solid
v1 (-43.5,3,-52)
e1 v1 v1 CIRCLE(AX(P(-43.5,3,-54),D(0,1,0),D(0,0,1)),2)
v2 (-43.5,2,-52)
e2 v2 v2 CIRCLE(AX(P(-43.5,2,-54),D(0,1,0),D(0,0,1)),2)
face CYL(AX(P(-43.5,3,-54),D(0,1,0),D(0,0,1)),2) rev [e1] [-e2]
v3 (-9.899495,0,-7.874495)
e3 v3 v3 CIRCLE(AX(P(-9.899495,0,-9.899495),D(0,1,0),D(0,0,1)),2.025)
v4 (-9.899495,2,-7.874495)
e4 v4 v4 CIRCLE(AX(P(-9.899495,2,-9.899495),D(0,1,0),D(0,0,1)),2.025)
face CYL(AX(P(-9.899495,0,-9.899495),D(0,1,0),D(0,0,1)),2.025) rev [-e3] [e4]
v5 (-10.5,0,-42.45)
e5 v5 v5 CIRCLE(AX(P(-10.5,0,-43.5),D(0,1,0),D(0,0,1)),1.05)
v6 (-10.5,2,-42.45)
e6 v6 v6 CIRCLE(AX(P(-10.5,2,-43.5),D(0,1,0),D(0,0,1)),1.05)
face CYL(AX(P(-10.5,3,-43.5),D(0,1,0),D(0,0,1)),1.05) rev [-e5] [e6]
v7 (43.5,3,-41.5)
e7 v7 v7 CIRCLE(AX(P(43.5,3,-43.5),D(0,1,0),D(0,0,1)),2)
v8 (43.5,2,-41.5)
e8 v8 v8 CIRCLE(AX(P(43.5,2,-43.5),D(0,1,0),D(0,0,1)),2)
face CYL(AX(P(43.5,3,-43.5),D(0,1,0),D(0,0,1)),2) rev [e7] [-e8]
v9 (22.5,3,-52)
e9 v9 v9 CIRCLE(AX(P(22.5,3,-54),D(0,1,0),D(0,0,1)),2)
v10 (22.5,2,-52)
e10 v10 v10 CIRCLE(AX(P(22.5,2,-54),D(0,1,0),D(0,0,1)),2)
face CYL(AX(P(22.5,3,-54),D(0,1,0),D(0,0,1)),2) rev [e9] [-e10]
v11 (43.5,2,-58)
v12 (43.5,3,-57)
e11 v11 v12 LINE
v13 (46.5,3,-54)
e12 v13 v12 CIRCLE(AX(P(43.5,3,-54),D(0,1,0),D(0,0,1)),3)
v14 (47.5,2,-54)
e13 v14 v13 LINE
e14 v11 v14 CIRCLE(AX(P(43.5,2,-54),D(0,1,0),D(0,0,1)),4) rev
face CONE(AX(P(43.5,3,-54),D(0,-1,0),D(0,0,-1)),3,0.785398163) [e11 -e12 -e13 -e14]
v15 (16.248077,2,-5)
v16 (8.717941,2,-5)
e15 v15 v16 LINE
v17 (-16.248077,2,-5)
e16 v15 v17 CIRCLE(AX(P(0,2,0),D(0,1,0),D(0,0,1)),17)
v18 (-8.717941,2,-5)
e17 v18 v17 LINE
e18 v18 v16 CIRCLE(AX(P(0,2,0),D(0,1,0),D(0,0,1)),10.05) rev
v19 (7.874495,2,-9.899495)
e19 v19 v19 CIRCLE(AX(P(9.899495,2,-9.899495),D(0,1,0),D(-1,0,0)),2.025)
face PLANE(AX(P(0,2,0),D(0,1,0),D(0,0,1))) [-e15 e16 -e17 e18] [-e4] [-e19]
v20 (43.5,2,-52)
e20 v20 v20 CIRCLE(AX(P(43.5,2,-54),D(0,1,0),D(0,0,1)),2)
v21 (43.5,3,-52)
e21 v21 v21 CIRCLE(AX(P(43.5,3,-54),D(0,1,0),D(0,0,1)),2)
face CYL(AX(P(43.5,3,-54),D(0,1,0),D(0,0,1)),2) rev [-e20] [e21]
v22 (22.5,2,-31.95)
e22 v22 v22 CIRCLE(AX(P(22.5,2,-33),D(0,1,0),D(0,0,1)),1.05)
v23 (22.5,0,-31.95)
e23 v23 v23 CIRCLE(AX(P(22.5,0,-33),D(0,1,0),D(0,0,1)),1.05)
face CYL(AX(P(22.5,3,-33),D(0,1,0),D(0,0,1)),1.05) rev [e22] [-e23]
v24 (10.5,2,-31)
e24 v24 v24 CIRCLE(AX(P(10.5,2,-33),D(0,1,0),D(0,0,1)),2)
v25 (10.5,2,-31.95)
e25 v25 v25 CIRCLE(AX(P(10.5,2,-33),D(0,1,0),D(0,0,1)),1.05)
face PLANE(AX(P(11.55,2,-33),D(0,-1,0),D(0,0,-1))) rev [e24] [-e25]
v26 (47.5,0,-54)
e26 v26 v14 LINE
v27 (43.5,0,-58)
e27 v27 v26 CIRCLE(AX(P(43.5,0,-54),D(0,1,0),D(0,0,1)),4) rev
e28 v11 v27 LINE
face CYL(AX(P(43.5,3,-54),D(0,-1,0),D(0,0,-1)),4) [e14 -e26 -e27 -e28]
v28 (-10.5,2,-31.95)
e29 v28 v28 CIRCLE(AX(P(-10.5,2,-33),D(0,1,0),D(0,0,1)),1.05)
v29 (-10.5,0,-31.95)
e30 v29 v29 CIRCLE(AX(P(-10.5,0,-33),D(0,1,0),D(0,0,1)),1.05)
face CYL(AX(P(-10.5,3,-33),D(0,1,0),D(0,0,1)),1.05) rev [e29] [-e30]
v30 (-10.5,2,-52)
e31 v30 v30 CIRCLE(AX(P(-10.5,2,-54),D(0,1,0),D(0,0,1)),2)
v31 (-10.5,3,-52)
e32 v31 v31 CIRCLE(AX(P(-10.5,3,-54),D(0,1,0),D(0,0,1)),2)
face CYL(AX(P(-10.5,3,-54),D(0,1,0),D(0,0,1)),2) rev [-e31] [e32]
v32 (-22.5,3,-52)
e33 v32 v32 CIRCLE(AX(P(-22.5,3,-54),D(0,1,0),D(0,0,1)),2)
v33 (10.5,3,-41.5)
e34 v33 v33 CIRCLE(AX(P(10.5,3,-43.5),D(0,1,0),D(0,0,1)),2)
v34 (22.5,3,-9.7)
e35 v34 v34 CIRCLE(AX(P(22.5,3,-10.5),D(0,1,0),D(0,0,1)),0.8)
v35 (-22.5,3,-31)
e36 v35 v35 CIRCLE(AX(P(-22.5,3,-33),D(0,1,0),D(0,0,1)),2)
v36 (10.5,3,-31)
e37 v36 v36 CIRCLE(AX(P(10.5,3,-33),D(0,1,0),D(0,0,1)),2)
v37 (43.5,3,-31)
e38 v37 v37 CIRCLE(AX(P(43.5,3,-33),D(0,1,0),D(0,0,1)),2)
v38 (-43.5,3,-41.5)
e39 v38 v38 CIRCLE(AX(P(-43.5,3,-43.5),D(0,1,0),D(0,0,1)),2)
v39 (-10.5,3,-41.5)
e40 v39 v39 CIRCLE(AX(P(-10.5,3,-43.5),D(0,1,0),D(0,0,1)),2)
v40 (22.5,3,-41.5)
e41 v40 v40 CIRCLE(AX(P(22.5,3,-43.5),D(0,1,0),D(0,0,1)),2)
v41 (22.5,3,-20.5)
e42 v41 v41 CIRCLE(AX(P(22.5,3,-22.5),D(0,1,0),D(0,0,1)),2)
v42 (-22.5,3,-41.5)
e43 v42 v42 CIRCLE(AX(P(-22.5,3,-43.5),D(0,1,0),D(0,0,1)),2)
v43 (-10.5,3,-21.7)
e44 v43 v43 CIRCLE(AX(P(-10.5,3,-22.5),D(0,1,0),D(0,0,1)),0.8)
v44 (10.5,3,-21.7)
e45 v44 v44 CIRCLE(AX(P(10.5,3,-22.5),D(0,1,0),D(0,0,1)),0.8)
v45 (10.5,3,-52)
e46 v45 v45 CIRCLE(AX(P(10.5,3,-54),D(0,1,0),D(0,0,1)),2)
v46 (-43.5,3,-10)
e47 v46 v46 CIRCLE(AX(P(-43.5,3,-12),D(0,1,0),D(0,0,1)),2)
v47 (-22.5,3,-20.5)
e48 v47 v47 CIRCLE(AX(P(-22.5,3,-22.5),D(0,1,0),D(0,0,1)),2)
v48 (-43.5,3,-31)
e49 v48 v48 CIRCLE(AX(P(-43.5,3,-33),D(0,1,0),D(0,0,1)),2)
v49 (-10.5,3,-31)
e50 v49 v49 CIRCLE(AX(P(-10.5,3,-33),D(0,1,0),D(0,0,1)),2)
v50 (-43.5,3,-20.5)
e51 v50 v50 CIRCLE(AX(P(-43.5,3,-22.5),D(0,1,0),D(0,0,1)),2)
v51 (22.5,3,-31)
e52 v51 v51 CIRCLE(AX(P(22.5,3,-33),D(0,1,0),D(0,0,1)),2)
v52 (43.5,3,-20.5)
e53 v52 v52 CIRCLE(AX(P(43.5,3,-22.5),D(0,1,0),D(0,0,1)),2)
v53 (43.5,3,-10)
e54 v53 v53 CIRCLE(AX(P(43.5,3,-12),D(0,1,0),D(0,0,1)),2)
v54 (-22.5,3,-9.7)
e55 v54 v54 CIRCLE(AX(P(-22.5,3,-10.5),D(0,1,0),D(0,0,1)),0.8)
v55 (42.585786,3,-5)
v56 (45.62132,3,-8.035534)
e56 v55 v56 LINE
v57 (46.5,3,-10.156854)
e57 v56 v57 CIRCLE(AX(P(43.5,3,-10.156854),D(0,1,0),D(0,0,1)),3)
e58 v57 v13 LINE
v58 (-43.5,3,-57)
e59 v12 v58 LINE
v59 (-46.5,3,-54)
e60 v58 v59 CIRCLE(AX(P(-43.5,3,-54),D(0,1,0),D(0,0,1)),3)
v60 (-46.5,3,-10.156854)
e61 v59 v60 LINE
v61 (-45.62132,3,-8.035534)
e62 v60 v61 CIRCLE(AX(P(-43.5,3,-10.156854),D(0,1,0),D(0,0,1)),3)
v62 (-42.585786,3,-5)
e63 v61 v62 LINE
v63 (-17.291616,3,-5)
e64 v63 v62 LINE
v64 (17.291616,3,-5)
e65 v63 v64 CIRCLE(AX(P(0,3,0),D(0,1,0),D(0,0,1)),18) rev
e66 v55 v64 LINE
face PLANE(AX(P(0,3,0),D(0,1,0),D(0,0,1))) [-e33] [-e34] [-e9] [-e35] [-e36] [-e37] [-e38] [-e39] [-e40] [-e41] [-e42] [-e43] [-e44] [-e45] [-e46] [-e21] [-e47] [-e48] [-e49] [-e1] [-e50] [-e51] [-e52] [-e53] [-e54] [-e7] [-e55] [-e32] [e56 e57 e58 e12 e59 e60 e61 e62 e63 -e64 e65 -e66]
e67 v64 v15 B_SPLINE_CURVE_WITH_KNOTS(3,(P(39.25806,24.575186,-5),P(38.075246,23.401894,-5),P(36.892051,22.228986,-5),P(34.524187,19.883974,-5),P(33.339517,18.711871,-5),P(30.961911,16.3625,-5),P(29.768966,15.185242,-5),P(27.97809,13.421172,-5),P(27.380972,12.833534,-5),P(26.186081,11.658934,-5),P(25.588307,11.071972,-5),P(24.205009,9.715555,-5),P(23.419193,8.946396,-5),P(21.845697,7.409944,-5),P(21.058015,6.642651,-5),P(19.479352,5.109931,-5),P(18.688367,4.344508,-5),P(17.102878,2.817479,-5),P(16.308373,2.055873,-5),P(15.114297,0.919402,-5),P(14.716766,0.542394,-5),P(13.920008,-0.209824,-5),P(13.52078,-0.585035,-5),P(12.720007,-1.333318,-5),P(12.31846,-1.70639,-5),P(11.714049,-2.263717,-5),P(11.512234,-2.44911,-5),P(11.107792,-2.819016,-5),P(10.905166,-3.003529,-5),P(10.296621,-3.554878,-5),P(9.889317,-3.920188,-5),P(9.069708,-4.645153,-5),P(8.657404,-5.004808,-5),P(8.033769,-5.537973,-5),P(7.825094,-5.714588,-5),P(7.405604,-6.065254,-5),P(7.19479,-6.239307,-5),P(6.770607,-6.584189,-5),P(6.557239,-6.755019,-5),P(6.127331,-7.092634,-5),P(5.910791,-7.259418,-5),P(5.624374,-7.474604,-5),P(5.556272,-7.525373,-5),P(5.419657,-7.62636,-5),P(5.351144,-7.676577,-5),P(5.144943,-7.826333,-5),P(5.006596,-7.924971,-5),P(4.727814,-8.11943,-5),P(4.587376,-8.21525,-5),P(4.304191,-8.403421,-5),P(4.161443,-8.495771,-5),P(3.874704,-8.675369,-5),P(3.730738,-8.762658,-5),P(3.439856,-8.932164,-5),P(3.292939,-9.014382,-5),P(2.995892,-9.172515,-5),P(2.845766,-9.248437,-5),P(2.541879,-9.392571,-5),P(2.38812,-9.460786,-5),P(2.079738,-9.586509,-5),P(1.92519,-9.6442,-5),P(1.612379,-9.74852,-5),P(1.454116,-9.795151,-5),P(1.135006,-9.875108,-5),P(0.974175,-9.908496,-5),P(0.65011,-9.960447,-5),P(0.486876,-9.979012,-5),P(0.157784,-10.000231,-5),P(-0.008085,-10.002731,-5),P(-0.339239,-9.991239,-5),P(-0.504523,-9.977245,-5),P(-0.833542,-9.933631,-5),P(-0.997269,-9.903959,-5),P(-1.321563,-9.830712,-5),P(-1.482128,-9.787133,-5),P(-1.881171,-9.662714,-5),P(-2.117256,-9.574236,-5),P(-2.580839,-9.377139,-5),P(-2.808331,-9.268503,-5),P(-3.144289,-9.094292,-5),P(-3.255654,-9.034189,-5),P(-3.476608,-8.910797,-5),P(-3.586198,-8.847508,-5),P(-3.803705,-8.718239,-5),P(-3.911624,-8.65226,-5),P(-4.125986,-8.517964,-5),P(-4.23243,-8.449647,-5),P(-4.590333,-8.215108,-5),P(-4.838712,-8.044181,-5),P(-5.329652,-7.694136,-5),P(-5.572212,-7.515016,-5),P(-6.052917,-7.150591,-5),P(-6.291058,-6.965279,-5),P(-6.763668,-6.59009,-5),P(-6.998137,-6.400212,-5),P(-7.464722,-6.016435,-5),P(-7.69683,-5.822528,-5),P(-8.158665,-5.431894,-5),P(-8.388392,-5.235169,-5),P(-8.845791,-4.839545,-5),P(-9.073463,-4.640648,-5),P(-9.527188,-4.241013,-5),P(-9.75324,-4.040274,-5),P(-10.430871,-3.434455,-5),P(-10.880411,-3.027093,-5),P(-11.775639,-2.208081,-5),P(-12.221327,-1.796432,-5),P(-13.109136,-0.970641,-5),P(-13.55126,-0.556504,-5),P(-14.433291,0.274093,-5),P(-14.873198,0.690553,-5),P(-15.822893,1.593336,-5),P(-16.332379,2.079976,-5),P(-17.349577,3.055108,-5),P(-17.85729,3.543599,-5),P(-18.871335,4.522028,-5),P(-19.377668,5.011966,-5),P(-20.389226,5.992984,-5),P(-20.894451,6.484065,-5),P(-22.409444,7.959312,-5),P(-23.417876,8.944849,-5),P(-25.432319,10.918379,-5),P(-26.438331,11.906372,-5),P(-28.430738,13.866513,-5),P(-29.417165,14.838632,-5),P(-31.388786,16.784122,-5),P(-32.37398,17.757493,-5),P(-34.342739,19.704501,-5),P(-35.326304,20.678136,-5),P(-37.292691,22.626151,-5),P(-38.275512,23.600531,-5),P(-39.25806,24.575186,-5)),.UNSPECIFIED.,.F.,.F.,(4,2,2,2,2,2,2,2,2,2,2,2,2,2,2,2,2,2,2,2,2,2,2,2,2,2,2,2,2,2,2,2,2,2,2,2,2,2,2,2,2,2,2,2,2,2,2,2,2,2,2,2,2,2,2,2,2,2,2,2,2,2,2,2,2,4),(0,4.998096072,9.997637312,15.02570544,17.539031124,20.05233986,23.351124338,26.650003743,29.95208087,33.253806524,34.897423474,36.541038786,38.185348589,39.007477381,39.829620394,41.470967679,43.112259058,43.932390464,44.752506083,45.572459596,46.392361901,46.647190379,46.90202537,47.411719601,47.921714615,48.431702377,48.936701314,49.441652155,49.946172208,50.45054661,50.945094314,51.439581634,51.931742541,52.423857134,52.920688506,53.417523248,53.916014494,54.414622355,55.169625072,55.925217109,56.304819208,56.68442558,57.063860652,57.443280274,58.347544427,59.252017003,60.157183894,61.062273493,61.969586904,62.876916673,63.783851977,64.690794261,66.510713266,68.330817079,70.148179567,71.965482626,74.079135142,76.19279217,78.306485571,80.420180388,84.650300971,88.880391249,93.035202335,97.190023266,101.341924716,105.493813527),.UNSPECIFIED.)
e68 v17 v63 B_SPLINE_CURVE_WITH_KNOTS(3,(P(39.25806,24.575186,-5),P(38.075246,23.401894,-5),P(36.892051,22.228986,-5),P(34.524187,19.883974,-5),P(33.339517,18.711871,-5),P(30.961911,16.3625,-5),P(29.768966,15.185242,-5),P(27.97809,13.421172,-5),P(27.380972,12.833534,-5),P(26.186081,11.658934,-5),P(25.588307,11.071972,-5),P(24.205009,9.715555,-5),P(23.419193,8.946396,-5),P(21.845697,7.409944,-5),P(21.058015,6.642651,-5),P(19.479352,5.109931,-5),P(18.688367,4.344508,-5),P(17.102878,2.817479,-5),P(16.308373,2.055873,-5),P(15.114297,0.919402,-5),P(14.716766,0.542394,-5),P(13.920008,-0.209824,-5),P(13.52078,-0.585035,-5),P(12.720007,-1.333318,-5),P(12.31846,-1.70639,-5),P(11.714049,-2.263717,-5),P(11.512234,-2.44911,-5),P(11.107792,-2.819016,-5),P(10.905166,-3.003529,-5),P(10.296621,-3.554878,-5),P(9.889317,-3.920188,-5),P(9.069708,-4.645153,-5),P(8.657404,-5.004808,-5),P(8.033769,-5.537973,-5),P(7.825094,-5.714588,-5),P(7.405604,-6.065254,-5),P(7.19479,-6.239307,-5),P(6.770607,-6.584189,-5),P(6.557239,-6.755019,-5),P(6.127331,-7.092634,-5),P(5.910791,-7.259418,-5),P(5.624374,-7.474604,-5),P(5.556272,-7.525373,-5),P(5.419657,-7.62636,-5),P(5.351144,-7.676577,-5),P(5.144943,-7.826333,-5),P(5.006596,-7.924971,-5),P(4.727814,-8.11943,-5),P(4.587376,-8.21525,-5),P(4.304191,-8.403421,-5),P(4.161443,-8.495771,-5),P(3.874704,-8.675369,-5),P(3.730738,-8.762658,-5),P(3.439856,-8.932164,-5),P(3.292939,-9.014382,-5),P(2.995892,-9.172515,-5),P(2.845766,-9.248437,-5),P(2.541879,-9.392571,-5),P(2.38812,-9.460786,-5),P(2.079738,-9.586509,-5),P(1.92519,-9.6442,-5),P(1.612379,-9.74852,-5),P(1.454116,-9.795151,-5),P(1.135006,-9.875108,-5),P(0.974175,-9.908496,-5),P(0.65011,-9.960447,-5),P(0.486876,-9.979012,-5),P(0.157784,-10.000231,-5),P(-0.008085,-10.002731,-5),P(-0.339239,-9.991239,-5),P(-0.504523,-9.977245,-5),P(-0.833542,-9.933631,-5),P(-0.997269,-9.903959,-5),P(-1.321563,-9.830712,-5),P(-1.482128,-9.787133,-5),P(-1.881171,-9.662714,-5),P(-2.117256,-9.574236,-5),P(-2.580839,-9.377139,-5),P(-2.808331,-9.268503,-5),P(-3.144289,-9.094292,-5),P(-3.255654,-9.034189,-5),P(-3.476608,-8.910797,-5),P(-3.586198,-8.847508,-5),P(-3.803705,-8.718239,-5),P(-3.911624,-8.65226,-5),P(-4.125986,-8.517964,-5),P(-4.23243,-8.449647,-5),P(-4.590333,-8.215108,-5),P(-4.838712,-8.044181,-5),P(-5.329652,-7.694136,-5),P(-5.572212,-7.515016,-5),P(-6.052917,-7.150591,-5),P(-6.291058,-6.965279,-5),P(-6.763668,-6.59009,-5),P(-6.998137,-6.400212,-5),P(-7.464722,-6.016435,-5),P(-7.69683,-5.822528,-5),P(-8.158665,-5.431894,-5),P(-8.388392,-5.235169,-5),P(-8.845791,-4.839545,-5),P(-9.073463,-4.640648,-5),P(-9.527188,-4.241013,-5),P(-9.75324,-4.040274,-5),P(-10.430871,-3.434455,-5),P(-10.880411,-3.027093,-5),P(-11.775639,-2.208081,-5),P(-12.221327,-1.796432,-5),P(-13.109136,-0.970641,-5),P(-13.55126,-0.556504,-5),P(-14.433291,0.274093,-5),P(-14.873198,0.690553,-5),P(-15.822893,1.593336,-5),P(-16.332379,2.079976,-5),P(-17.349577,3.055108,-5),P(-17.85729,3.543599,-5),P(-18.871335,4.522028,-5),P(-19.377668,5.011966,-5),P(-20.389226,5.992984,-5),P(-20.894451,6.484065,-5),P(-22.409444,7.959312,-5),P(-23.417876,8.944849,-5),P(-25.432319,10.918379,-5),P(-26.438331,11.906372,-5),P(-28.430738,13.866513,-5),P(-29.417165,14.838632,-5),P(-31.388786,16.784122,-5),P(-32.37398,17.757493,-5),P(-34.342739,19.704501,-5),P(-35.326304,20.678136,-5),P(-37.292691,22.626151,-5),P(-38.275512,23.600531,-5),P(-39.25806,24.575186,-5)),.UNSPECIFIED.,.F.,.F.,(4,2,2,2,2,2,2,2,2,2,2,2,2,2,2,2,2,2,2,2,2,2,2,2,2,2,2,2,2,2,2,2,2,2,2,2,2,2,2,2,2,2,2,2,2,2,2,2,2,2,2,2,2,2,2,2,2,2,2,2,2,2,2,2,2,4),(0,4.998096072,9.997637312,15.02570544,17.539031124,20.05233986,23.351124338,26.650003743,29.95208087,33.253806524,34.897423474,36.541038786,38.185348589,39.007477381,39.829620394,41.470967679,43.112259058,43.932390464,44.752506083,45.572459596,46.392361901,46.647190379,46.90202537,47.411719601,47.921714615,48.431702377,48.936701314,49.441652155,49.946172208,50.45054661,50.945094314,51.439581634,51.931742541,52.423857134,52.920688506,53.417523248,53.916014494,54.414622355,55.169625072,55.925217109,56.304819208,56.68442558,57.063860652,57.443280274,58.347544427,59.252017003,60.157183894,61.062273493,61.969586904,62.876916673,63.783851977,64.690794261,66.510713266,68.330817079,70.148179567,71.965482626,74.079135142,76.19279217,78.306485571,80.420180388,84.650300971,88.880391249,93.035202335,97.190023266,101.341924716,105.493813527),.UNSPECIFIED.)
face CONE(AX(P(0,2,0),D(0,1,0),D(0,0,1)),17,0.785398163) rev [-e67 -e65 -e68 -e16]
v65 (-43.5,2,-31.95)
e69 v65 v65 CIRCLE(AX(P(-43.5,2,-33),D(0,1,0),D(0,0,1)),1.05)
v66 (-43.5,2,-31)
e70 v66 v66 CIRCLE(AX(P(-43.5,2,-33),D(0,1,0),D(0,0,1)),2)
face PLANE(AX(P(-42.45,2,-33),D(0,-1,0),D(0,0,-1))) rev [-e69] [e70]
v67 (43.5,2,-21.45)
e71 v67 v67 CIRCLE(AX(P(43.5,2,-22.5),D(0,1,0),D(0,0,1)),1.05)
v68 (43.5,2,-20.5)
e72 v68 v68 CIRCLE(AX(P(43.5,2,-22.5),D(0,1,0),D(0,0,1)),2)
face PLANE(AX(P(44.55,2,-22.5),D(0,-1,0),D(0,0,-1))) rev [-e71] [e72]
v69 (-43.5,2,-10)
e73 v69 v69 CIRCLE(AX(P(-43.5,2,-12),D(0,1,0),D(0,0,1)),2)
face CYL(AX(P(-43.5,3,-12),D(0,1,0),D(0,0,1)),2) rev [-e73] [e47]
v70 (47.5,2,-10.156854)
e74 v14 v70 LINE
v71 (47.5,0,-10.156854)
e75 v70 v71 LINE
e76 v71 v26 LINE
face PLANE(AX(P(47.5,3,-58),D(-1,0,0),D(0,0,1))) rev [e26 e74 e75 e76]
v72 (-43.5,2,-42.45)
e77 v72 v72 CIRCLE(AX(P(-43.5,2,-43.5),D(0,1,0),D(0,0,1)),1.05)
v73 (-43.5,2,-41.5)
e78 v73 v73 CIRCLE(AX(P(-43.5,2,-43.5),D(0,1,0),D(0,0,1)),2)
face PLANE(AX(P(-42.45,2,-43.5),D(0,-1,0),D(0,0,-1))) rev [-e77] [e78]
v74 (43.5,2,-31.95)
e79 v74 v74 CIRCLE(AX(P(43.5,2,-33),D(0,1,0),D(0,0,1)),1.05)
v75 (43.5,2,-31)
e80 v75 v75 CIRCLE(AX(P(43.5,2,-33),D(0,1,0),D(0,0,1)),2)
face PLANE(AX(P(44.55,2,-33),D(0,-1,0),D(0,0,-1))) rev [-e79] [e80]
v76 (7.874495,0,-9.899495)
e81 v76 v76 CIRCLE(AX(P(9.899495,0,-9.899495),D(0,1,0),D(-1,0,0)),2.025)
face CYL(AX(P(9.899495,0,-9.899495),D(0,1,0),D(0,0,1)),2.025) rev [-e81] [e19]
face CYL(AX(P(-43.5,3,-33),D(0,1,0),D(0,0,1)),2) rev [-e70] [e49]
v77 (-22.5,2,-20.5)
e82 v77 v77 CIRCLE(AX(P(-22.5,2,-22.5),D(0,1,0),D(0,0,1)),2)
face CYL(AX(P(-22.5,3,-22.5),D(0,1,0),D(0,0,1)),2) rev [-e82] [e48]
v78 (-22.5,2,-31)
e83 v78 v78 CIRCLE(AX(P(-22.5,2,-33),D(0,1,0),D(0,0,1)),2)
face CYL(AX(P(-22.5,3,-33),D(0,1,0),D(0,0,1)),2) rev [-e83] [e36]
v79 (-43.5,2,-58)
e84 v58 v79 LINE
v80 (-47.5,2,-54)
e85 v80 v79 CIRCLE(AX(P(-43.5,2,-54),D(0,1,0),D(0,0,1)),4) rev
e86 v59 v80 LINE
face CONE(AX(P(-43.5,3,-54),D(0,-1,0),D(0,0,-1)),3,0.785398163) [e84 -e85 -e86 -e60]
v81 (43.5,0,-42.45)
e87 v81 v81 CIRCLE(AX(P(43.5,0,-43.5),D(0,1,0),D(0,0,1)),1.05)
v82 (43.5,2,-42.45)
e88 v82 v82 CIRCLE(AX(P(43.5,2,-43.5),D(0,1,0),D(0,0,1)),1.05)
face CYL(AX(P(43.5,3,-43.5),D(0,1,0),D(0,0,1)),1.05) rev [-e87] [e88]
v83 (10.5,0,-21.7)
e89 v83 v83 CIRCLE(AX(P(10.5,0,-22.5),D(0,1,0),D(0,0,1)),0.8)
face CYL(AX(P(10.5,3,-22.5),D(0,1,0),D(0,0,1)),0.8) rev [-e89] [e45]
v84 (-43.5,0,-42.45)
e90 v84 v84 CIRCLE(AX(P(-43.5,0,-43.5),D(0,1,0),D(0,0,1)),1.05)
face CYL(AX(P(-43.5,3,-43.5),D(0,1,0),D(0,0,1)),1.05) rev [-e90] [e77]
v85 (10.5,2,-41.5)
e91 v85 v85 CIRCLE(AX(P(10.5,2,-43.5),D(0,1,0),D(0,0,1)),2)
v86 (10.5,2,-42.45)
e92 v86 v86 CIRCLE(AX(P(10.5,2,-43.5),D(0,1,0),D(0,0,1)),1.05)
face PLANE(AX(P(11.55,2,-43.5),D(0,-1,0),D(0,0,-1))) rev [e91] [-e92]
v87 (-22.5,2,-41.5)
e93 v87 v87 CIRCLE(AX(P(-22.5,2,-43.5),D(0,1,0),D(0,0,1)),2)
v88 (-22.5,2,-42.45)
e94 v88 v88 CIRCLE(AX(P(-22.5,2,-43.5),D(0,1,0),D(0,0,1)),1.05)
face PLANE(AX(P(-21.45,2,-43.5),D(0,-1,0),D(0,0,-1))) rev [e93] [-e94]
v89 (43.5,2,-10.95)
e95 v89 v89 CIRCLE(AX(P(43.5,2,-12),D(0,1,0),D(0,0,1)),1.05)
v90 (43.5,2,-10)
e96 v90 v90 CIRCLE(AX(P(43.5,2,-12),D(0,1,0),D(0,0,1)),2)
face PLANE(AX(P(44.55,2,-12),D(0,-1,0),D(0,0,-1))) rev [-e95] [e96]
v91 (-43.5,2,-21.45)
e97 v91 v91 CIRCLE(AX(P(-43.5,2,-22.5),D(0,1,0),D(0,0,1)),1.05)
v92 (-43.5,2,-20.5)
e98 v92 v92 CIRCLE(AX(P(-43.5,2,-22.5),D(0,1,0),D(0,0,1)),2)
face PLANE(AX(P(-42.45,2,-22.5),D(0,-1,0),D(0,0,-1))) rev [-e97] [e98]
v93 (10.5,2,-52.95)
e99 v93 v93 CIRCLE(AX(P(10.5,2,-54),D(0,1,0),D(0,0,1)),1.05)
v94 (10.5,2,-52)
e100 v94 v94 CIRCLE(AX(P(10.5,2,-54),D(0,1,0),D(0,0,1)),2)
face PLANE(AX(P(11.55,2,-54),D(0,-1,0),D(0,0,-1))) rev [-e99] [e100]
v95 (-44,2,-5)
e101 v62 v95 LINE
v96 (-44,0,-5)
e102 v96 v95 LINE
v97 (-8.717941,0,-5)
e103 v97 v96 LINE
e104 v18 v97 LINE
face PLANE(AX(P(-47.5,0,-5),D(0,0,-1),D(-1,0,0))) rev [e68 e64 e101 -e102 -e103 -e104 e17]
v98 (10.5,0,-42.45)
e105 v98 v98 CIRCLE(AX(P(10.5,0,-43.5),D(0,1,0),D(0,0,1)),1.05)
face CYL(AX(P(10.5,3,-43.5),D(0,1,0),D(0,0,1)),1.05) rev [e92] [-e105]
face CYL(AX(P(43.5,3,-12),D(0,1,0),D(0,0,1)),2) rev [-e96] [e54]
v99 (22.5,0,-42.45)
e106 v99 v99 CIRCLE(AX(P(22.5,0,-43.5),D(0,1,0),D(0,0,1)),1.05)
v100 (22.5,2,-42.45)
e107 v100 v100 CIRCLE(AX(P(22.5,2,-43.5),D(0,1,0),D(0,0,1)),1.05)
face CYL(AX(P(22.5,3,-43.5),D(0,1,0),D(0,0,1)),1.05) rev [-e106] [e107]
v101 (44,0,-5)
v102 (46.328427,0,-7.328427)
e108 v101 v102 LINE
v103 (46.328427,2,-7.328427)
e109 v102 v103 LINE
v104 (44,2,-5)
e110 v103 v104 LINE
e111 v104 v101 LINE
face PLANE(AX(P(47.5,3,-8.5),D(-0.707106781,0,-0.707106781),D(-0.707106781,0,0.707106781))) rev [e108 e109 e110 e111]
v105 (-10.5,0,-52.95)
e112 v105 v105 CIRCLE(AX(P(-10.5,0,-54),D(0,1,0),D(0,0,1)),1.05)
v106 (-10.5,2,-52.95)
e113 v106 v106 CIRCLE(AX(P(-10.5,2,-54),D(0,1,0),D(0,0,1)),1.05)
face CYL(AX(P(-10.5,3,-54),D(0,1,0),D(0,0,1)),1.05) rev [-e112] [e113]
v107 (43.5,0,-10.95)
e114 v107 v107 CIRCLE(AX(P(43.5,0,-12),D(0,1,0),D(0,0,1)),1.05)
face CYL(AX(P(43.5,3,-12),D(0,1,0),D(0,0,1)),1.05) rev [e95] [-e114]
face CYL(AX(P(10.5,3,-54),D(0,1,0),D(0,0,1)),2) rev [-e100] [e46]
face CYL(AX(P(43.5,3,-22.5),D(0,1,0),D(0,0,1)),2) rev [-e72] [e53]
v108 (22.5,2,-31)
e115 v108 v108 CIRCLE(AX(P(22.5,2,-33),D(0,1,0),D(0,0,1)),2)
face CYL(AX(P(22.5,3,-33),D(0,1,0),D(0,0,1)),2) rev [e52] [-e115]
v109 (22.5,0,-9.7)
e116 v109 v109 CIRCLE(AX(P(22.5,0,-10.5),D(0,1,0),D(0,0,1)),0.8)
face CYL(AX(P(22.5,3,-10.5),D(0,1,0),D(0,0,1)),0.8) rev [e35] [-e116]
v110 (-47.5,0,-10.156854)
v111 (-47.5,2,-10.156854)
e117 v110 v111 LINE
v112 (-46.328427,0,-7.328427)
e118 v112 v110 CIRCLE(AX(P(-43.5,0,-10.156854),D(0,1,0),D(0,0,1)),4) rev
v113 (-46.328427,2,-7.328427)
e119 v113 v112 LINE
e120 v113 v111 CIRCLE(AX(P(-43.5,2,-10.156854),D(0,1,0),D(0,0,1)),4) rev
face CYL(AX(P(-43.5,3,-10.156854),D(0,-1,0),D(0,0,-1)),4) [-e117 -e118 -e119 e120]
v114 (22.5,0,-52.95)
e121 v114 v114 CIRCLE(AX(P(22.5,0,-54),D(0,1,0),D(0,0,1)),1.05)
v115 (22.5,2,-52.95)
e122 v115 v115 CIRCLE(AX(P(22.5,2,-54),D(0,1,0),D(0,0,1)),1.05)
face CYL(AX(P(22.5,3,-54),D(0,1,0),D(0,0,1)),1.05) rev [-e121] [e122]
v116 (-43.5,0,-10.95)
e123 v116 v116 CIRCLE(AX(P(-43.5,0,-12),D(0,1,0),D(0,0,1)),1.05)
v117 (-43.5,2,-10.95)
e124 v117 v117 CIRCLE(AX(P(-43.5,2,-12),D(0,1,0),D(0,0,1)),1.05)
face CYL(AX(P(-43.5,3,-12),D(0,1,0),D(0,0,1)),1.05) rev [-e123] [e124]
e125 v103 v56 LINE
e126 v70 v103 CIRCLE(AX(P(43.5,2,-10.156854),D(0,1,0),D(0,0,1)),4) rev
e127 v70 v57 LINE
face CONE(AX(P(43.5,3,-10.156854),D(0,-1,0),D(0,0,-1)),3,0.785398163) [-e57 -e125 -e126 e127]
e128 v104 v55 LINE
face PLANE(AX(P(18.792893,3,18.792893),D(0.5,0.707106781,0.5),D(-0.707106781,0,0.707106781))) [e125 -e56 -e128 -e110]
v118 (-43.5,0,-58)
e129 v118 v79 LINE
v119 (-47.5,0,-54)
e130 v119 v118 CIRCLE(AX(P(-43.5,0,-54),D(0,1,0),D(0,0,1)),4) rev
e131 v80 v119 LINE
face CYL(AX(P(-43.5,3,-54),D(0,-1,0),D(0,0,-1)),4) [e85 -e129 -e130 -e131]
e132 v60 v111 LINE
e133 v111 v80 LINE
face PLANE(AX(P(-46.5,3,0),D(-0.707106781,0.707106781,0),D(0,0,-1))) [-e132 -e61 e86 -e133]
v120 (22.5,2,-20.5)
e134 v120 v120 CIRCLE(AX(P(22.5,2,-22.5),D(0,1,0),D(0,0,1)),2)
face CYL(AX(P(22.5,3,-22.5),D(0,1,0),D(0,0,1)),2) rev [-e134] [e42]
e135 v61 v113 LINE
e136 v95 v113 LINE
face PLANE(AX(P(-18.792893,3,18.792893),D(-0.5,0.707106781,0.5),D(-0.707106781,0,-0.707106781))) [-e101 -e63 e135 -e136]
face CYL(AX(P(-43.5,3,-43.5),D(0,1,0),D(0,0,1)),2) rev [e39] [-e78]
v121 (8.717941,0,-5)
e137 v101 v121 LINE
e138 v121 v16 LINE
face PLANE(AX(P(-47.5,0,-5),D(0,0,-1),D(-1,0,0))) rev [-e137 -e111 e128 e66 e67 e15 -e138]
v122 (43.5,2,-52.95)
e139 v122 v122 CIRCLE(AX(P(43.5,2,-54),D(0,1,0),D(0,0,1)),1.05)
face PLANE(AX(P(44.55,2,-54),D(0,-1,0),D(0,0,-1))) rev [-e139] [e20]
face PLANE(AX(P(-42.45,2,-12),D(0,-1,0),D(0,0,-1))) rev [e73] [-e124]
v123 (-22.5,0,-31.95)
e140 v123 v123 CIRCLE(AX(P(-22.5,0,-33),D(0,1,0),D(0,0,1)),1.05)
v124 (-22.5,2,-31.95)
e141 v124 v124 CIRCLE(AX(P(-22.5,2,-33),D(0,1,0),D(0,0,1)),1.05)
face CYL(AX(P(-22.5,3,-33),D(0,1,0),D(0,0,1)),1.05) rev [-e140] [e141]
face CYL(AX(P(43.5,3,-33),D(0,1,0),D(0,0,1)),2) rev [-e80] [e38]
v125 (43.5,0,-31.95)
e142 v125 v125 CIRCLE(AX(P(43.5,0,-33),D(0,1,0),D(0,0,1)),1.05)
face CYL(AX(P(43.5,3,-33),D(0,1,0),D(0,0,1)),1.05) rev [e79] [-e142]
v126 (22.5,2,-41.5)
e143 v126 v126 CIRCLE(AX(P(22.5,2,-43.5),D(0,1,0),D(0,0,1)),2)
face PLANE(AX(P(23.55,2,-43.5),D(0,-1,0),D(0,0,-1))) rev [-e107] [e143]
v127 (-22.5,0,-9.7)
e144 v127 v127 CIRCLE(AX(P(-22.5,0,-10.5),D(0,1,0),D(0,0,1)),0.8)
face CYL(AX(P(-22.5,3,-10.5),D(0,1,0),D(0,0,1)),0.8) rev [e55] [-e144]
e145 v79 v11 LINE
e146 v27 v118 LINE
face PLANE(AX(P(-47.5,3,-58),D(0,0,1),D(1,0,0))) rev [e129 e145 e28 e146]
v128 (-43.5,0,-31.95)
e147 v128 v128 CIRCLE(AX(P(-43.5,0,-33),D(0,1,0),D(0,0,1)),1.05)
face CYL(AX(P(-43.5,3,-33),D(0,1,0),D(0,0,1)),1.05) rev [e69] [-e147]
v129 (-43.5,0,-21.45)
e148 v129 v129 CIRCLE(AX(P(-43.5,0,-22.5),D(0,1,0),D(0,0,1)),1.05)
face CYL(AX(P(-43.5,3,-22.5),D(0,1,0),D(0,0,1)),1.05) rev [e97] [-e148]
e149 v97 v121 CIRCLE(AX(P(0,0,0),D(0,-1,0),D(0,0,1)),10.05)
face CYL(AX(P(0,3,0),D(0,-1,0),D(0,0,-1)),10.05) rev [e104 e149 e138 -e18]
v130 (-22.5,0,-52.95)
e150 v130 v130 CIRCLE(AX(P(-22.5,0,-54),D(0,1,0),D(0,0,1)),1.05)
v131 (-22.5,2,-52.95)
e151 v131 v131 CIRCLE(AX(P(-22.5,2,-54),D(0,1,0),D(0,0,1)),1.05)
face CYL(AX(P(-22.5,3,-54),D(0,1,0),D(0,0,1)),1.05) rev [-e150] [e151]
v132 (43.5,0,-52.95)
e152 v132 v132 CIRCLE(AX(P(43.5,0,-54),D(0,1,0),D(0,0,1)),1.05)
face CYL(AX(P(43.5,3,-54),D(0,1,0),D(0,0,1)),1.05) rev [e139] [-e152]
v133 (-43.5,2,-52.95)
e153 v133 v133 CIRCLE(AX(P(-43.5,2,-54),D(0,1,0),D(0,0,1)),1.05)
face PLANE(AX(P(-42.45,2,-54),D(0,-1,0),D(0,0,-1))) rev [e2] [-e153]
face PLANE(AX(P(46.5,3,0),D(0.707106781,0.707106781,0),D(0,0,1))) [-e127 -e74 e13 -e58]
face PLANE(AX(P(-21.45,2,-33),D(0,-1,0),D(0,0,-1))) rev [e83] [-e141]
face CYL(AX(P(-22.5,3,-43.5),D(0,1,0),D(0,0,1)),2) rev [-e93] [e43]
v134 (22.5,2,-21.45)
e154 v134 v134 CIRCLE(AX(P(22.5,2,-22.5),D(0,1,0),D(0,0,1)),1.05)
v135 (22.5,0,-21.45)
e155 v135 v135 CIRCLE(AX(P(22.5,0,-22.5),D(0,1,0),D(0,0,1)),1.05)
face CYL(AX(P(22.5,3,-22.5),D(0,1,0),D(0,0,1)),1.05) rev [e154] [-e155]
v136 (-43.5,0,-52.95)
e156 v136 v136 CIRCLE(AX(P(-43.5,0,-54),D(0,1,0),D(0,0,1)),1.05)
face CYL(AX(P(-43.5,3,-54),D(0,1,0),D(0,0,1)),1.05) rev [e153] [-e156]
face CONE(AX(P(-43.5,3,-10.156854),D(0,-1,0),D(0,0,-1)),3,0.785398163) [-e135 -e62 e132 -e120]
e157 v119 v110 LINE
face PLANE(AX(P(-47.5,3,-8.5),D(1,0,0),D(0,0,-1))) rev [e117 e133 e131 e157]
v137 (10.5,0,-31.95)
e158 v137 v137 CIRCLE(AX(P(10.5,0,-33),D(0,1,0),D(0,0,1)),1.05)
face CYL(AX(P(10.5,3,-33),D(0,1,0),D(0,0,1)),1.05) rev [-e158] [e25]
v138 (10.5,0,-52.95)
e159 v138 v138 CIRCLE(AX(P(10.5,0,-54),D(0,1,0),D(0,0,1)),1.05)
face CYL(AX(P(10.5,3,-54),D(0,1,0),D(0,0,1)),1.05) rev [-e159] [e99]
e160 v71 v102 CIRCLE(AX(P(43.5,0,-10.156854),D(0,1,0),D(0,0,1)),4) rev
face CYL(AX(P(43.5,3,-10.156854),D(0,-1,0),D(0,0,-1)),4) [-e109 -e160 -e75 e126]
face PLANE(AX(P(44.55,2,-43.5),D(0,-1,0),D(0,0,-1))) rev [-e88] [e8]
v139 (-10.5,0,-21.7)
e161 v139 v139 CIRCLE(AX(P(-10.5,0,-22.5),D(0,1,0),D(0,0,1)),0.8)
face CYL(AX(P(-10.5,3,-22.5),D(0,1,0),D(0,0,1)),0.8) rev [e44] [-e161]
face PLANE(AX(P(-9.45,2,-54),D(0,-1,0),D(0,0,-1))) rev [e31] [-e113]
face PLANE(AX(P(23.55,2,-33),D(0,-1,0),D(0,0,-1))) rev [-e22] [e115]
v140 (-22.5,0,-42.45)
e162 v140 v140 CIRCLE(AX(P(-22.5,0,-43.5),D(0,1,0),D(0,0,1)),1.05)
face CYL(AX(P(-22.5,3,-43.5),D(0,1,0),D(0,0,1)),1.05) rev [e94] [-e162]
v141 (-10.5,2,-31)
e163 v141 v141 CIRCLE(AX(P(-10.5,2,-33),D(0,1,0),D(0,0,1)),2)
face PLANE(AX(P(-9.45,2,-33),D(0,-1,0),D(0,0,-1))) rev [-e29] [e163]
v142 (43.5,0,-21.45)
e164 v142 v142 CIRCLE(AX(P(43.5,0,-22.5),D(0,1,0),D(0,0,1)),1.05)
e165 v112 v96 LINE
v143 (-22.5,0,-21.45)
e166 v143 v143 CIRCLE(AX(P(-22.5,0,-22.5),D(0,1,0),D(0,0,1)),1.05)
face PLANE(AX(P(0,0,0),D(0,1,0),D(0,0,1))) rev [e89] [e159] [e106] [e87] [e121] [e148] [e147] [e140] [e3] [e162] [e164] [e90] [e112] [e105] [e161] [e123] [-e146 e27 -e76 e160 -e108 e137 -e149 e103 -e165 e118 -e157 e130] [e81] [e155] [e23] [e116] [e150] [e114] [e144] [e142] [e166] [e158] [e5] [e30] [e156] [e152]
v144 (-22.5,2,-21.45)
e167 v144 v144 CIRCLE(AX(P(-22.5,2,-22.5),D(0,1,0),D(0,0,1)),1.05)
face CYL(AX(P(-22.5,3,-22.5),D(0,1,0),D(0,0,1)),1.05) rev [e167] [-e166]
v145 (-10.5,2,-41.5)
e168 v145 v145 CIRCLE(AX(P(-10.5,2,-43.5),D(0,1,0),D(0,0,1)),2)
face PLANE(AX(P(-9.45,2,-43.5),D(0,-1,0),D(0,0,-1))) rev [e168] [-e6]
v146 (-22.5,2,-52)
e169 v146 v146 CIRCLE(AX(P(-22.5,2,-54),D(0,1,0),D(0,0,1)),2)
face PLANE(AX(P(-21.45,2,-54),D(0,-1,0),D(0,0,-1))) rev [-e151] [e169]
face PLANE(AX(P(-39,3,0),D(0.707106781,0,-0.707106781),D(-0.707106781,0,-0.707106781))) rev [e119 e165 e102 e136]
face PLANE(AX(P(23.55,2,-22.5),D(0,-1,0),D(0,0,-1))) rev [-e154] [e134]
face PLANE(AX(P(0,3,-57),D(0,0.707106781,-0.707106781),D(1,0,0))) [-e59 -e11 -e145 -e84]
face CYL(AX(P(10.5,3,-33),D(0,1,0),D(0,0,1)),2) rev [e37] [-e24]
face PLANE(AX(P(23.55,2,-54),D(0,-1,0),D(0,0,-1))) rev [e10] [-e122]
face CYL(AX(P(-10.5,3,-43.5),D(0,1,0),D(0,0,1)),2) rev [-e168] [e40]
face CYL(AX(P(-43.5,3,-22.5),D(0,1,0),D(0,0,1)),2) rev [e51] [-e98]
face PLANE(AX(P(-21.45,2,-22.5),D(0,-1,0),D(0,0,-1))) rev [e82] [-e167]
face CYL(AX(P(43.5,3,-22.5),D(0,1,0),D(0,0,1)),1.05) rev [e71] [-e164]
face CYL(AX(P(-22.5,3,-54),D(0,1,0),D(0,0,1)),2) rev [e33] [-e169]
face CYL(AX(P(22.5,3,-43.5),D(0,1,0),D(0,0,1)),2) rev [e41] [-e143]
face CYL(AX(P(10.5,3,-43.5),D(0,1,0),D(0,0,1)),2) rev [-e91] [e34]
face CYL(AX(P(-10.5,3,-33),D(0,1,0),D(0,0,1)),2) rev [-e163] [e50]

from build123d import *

# Parameters (mm, degrees)
EXTRUDE_1_DEPTH               = 3
HOLE_WIZARD_M2_1_AT_2_COUNT   = 2
HOLE_WIZARD_M2_1_AT_2_PITCH   = 21
PATTERN_LINEAR_1_COUNT        = 3
PATTERN_LINEAR_1_PITCH        = 33
PATTERN_LINEAR_2_COUNT        = 3
PATTERN_LINEAR_2_PITCH        = 10.5
PATTERN_LINEAR_3_COUNT        = 2
PATTERN_LINEAR_3_PITCH        = 31.5
HOLE_WIZARD_M2_1_2_AT_2_COUNT = 2
HOLE_WIZARD_M2_1_2_AT_2_PITCH = 16.970562748
SKETCH_8_R                    = 17
CUT_EXTRUDE_1_DEPTH           = 1
SKETCH_9_R                    = 2.025
CUT_EXTRUDE_2_DEPTH           = 75.994999833
PATTERN_CIRCULAR_1_COUNT      = 2
PATTERN_CIRCULAR_1_ANGLE      = 90
FILLET_1_R                    = 4
CHAMFER_1_SIZE                = 1
SKETCH_11_W                   = 95
SKETCH_11_H                   = 10
CUT_EXTRUDE_3_DEPTH           = 76.028327984


with BuildPart() as part:
    # ｽｹｯﾁ1 → ﾎﾞｽ - 押し出し1 (new body)
    with BuildSketch(Plane(origin=(0, 0, 0), x_dir=(1, 0, 0), z_dir=(0, 1, 0))):
        with BuildLine():
            Line((-10.05, 0), (-39, 0))
            Line((-39, 0), (-47.5, 8.5))
            Line((-47.5, 8.5), (-47.5, 58))
            Line((-47.5, 58), (47.5, 58))
            Line((47.5, 58), (47.5, 8.5))
            Line((47.5, 8.5), (39, 0))
            Line((39, 0), (10.05, 0))
            ThreePointArc((10.05, 0), (0, 10.05), (-10.05, 0))
        make_face()
    extrude(amount=EXTRUDE_1_DEPTH)

    # ｽｹｯﾁ3 → Hole Wizard M2 _1 (revolve, cut)
    with BuildSketch(Plane(origin=(-43.5, 3, -54), x_dir=(0, 0, 1), z_dir=(1, 0, 0))):
        Polygon((0, 0), (0, 4.63090365), (1.05, 4), (1.05, 1), (2, 1), (2, 0), align=None)
    hole_wizard_m2_1 = revolve(axis=Axis((-43.5, 9.35, -54), (0, -1, 0)), mode=Mode.SUBTRACT)

    # Hole Wizard M2 _1 at 2: Hole Wizard M2 _1 ×2
    with Locations(*[(i * HOLE_WIZARD_M2_1_AT_2_PITCH, 0, 0) for i in range(1, HOLE_WIZARD_M2_1_AT_2_COUNT)]):
        add(hole_wizard_m2_1, mode=Mode.SUBTRACT)

    # 直線ﾊﾟﾀｰﾝ1: Hole Wizard M2 _1 ×3
    with Locations(*[(i * PATTERN_LINEAR_1_PITCH, 0, 0) for i in range(1, PATTERN_LINEAR_1_COUNT)]):
        add(hole_wizard_m2_1, mode=Mode.SUBTRACT)

    # 直線ﾊﾟﾀｰﾝ1 copy 1 sketch → 直線ﾊﾟﾀｰﾝ1 copy 1 (revolve, cut)
    with BuildSketch(Plane(origin=(10.5, 3, -54), x_dir=(0, 0, 1), z_dir=(1, 0, 0))):
        Polygon((0, 0), (0, 4.63090365), (1.05, 4), (1.05, 1), (2, 1), (2, 0), align=None)
    revolve(axis=Axis((10.5, 9.35, -54), (0, -1, 0)), mode=Mode.SUBTRACT)

    # 直線ﾊﾟﾀｰﾝ1 copy 2 sketch → 直線ﾊﾟﾀｰﾝ1 copy 2 (revolve, cut)
    with BuildSketch(Plane(origin=(43.5, 3, -54), x_dir=(0, 0, 1), z_dir=(1, 0, 0))):
        Polygon((0, 0), (0, 4.63090365), (1.05, 4), (1.05, 1), (2, 1), (2, 0), align=None)
    revolve(axis=Axis((43.5, 9.35, -54), (0, -1, 0)), mode=Mode.SUBTRACT)

    # 直線ﾊﾟﾀｰﾝ2: Hole Wizard M2 _1 ×3
    with Locations(*[(0, 0, i * PATTERN_LINEAR_2_PITCH) for i in range(1, PATTERN_LINEAR_2_COUNT)]):
        add(hole_wizard_m2_1, mode=Mode.SUBTRACT)

    # 直線ﾊﾟﾀｰﾝ2 copy 1 sketch → 直線ﾊﾟﾀｰﾝ2 copy 1 (revolve, cut)
    with BuildSketch(Plane(origin=(-22.5, 3, -43.5), x_dir=(0, 0, 1), z_dir=(1, 0, 0))):
        Polygon((0, 0), (0, 4.63090365), (1.05, 4), (1.05, 1), (2, 1), (2, 0), align=None)
    revolve(axis=Axis((-22.5, 9.35, -43.5), (0, -1, 0)), mode=Mode.SUBTRACT)

    # 直線ﾊﾟﾀｰﾝ2 copy 2 sketch → 直線ﾊﾟﾀｰﾝ2 copy 2 (revolve, cut)
    with BuildSketch(Plane(origin=(-22.5, 3, -33), x_dir=(0, 0, 1), z_dir=(1, 0, 0))):
        Polygon((0, 0), (0, 4.63090365), (1.05, 4), (1.05, 1), (2, 1), (2, 0), align=None)
    revolve(axis=Axis((-22.5, 9.35, -33), (0, -1, 0)), mode=Mode.SUBTRACT)

    # 直線ﾊﾟﾀｰﾝ2 copy 3 sketch → 直線ﾊﾟﾀｰﾝ2 copy 3 (revolve, cut)
    with BuildSketch(Plane(origin=(-10.5, 3, -43.5), x_dir=(0, 0, 1), z_dir=(1, 0, 0))):
        Polygon((0, 0), (0, 4.63090365), (1.05, 4), (1.05, 1), (2, 1), (2, 0), align=None)
    revolve(axis=Axis((-10.5, 9.35, -43.5), (0, -1, 0)), mode=Mode.SUBTRACT)

    # 直線ﾊﾟﾀｰﾝ2 copy 4 sketch → 直線ﾊﾟﾀｰﾝ2 copy 4 (revolve, cut)
    with BuildSketch(Plane(origin=(-10.5, 3, -33), x_dir=(0, 0, 1), z_dir=(1, 0, 0))):
        Polygon((0, 0), (0, 4.63090365), (1.05, 4), (1.05, 1), (2, 1), (2, 0), align=None)
    revolve(axis=Axis((-10.5, 9.35, -33), (0, -1, 0)), mode=Mode.SUBTRACT)

    # 直線ﾊﾟﾀｰﾝ2 copy 5 sketch → 直線ﾊﾟﾀｰﾝ2 copy 5 (revolve, cut)
    with BuildSketch(Plane(origin=(22.5, 3, -43.5), x_dir=(0, 0, 1), z_dir=(1, 0, 0))):
        Polygon((0, 0), (0, 4.63090365), (1.05, 4), (1.05, 1), (2, 1), (2, 0), align=None)
    revolve(axis=Axis((22.5, 9.35, -43.5), (0, -1, 0)), mode=Mode.SUBTRACT)

    # 直線ﾊﾟﾀｰﾝ2 copy 6 sketch → 直線ﾊﾟﾀｰﾝ2 copy 6 (revolve, cut)
    with BuildSketch(Plane(origin=(22.5, 3, -33), x_dir=(0, 0, 1), z_dir=(1, 0, 0))):
        Polygon((0, 0), (0, 4.63090365), (1.05, 4), (1.05, 1), (2, 1), (2, 0), align=None)
    revolve(axis=Axis((22.5, 9.35, -33), (0, -1, 0)), mode=Mode.SUBTRACT)

    # 直線ﾊﾟﾀｰﾝ2 copy 7 sketch → 直線ﾊﾟﾀｰﾝ2 copy 7 (revolve, cut)
    with BuildSketch(Plane(origin=(10.5, 3, -43.5), x_dir=(0, 0, 1), z_dir=(1, 0, 0))):
        Polygon((0, 0), (0, 4.63090365), (1.05, 4), (1.05, 1), (2, 1), (2, 0), align=None)
    revolve(axis=Axis((10.5, 9.35, -43.5), (0, -1, 0)), mode=Mode.SUBTRACT)

    # 直線ﾊﾟﾀｰﾝ2 copy 8 sketch → 直線ﾊﾟﾀｰﾝ2 copy 8 (revolve, cut)
    with BuildSketch(Plane(origin=(10.5, 3, -33), x_dir=(0, 0, 1), z_dir=(1, 0, 0))):
        Polygon((0, 0), (0, 4.63090365), (1.05, 4), (1.05, 1), (2, 1), (2, 0), align=None)
    revolve(axis=Axis((10.5, 9.35, -33), (0, -1, 0)), mode=Mode.SUBTRACT)

    # 直線ﾊﾟﾀｰﾝ2 copy 9 sketch → 直線ﾊﾟﾀｰﾝ2 copy 9 (revolve, cut)
    with BuildSketch(Plane(origin=(43.5, 3, -43.5), x_dir=(0, 0, 1), z_dir=(1, 0, 0))):
        Polygon((0, 0), (0, 4.63090365), (1.05, 4), (1.05, 1), (2, 1), (2, 0), align=None)
    revolve(axis=Axis((43.5, 9.35, -43.5), (0, -1, 0)), mode=Mode.SUBTRACT)

    # 直線ﾊﾟﾀｰﾝ2 copy 10 sketch → 直線ﾊﾟﾀｰﾝ2 copy 10 (revolve, cut)
    with BuildSketch(Plane(origin=(43.5, 3, -33), x_dir=(0, 0, 1), z_dir=(1, 0, 0))):
        Polygon((0, 0), (0, 4.63090365), (1.05, 4), (1.05, 1), (2, 1), (2, 0), align=None)
    revolve(axis=Axis((43.5, 9.35, -33), (0, -1, 0)), mode=Mode.SUBTRACT)

    # 直線ﾊﾟﾀｰﾝ3: Hole Wizard M2 _1 ×2
    with Locations(*[(0, 0, i * PATTERN_LINEAR_3_PITCH) for i in range(1, PATTERN_LINEAR_3_COUNT)]):
        add(hole_wizard_m2_1, mode=Mode.SUBTRACT)

    # 直線ﾊﾟﾀｰﾝ3 copy 1 sketch → 直線ﾊﾟﾀｰﾝ3 copy 1 (revolve, cut)
    with BuildSketch(Plane(origin=(-22.5, 3, -22.5), x_dir=(0, 0, 1), z_dir=(1, 0, 0))):
        Polygon((0, 0), (0, 4.63090365), (1.05, 4), (1.05, 1), (2, 1), (2, 0), align=None)
    revolve(axis=Axis((-22.5, 9.35, -22.5), (0, -1, 0)), mode=Mode.SUBTRACT)

    # ｽｹｯﾁ5 → Hole Wizard M2 _1 2 (revolve, cut)
    with BuildSketch(Plane(origin=(-10.5, 3, -22.5), x_dir=(0, 0, 1), z_dir=(1, 0, 0))):
        Polygon((0, 0), (0, 6.480688495), (0.8, 6), (0.8, 0), align=None)
    hole_wizard_m2_1_2 = revolve(axis=Axis((-10.5, 9.35, -22.5), (0, -1, 0)), mode=Mode.SUBTRACT)

    # Hole Wizard M2 _1 2 at 2: Hole Wizard M2 _1 2 ×2
    with Locations(*[Vector(-0.7071067811865469, 0, 0.7071067811865482) * (i * HOLE_WIZARD_M2_1_2_AT_2_PITCH) for i in range(1, HOLE_WIZARD_M2_1_2_AT_2_COUNT)]):
        add(hole_wizard_m2_1_2, mode=Mode.SUBTRACT)

    # ｽｹｯﾁ7 → M2 なべ頭ねじ用座ぐり穴2 (revolve, cut)
    with BuildSketch(Plane(origin=(-43.5, 3, -12), x_dir=(0, 0, 1), z_dir=(1, 0, 0))):
        Polygon((0, 0), (0, 6.63090365), (1.05, 6), (1.05, 1), (2, 1), (2, 0), align=None)
    hole_wizard_m2_2 = revolve(axis=Axis((-43.5, 9.35, -12), (0, -1, 0)), mode=Mode.SUBTRACT)

    # ﾐﾗｰ1: Hole Wizard M2 _1 2, M2 なべ頭ねじ用座ぐり穴2 across plane
    add(hole_wizard_m2_1_2.mirror(Plane(origin=(0, 0, 0), x_dir=(0, 0, 1), z_dir=(1, 0, 0))), mode=Mode.SUBTRACT)
    add(hole_wizard_m2_2.mirror(Plane(origin=(0, 0, 0), x_dir=(0, 0, 1), z_dir=(1, 0, 0))), mode=Mode.SUBTRACT)

    # ﾐﾗｰ1 copy 1 sketch → ﾐﾗｰ1 copy 1 (revolve, cut)
    with BuildSketch(Plane(origin=(43.5, 3, -22.5), x_dir=(0, 0, 1), z_dir=(-1, 0, 0))):
        Polygon((0, 0), (0, -4.63090365), (1.05, -4), (1.05, -1), (2, -1), (2, 0), align=None)
    revolve(axis=Axis((43.5, 9.35, -22.5), (0, 1, 0)), mode=Mode.SUBTRACT)

    # ﾐﾗｰ1 copy 2 sketch → ﾐﾗｰ1 copy 2 (revolve, cut)
    with BuildSketch(Plane(origin=(22.5, 3, -22.5), x_dir=(0, 0, 1), z_dir=(-1, 0, 0))):
        Polygon((0, 0), (0, -4.63090365), (1.05, -4), (1.05, -1), (2, -1), (2, 0), align=None)
    revolve(axis=Axis((22.5, 9.35, -22.5), (0, 1, 0)), mode=Mode.SUBTRACT)

    # ﾐﾗｰ1 copy 3 sketch → ﾐﾗｰ1 copy 3 (revolve, cut)
    with BuildSketch(Plane(origin=(43.5, 3, -54), x_dir=(0, 0, 1), z_dir=(-1, 0, 0))):
        Polygon((0, 0), (0, -4.63090365), (1.05, -4), (1.05, -1), (2, -1), (2, 0), align=None)
    revolve(axis=Axis((43.5, 9.35, -54), (0, 1, 0)), mode=Mode.SUBTRACT)

    # ﾐﾗｰ1 copy 4 sketch → ﾐﾗｰ1 copy 4 (revolve, cut)
    with BuildSketch(Plane(origin=(22.5, 3, -54), x_dir=(0, 0, 1), z_dir=(-1, 0, 0))):
        Polygon((0, 0), (0, -4.63090365), (1.05, -4), (1.05, -1), (2, -1), (2, 0), align=None)
    revolve(axis=Axis((22.5, 9.35, -54), (0, 1, 0)), mode=Mode.SUBTRACT)

    # ﾐﾗｰ1 copy 5 sketch → ﾐﾗｰ1 copy 5 (revolve, cut)
    with BuildSketch(Plane(origin=(22.5, 3, -10.5), x_dir=(0, 0, 1), z_dir=(-1, 0, 0))):
        Polygon((0, 0), (0, -6.480688495), (0.8, -6), (0.8, 0), align=None)
    revolve(axis=Axis((22.5, 9.35, -10.5), (0, 1, 0)), mode=Mode.SUBTRACT)

    # ｽｹｯﾁ8 → ｶｯﾄ - 押し出し1 (cut)
    with BuildSketch(Plane(origin=(0, 3, 0), x_dir=(1, 0, 0), z_dir=(0, 1, 0))):
        Circle(SKETCH_8_R)
    extrude(amount=-CUT_EXTRUDE_1_DEPTH, mode=Mode.SUBTRACT)

    # ｽｹｯﾁ9 → ｶｯﾄ - 押し出し2 (cut, through all)
    with BuildSketch(Plane(origin=(0, 2, 0), x_dir=(1, 0, 0), z_dir=(0, 1, 0))):
        with Locations(Location((-9.899494937, 9.899494937, 0), (0, 0, 270))):
            Circle(SKETCH_9_R)
    cut_extrude_2 = extrude(amount=-CUT_EXTRUDE_2_DEPTH, mode=Mode.SUBTRACT)

    # 円形ﾊﾟﾀｰﾝ1: ｶｯﾄ - 押し出し2 ×2 about axis
    pattern_circular_1_axis = Axis((0, 3, 0), (0, -1, 0))
    for i in range(1, PATTERN_CIRCULAR_1_COUNT):
        add(cut_extrude_2.rotate(pattern_circular_1_axis, i * PATTERN_CIRCULAR_1_ANGLE / (PATTERN_CIRCULAR_1_COUNT - 1)), mode=Mode.SUBTRACT)

    # ﾌｨﾚｯﾄ1
    fillet_1_edges = [part.edges().sort_by_distance(p)[0] for p in [
        (-47.5, 1.5, -8.5),
        (-47.5, 1.5, -58),
        (47.5, 1.5, -58),
        (47.5, 1.5, -8.5),
        (39, 1.5, 0),
        (-39, 1.5, 0),
    ]]
    fillet(fillet_1_edges, radius=FILLET_1_R)

    # 面取り1
    chamfer_1_edges = [part.edges().sort_by_distance(p)[0] for p in [
        (0, 3, -17),
        (27.171572875, 3, 0),
        (38.87387948, 3, -0.30448187),
        (43.25, 3, -4.25),
        (47.19551813, 3, -8.62612052),
        (47.5, 3, -32.078427125),
        (-27.171572875, 3, 0),
        (46.328427125, 3, -56.828427125),
        (-38.87387948, 3, -0.30448187),
        (0, 3, -58),
        (-43.25, 3, -4.25),
        (-46.328427125, 3, -56.828427125),
        (-47.19551813, 3, -8.62612052),
        (-47.5, 3, -32.078427125),
    ]]
    chamfer(chamfer_1_edges, length=CHAMFER_1_SIZE - 0.0001)  # a hair under: the kernel refuses the full size

    # ｽｹｯﾁ11 → ｶｯﾄ - 押し出し3 (cut, through all)
    with BuildSketch(Plane(origin=(0, 3, 0), x_dir=(1, 0, 0), z_dir=(0, 1, 0))):
        Rectangle(SKETCH_11_W, SKETCH_11_H)
    extrude(amount=-CUT_EXTRUDE_3_DEPTH, mode=Mode.SUBTRACT)


solid = part.part
